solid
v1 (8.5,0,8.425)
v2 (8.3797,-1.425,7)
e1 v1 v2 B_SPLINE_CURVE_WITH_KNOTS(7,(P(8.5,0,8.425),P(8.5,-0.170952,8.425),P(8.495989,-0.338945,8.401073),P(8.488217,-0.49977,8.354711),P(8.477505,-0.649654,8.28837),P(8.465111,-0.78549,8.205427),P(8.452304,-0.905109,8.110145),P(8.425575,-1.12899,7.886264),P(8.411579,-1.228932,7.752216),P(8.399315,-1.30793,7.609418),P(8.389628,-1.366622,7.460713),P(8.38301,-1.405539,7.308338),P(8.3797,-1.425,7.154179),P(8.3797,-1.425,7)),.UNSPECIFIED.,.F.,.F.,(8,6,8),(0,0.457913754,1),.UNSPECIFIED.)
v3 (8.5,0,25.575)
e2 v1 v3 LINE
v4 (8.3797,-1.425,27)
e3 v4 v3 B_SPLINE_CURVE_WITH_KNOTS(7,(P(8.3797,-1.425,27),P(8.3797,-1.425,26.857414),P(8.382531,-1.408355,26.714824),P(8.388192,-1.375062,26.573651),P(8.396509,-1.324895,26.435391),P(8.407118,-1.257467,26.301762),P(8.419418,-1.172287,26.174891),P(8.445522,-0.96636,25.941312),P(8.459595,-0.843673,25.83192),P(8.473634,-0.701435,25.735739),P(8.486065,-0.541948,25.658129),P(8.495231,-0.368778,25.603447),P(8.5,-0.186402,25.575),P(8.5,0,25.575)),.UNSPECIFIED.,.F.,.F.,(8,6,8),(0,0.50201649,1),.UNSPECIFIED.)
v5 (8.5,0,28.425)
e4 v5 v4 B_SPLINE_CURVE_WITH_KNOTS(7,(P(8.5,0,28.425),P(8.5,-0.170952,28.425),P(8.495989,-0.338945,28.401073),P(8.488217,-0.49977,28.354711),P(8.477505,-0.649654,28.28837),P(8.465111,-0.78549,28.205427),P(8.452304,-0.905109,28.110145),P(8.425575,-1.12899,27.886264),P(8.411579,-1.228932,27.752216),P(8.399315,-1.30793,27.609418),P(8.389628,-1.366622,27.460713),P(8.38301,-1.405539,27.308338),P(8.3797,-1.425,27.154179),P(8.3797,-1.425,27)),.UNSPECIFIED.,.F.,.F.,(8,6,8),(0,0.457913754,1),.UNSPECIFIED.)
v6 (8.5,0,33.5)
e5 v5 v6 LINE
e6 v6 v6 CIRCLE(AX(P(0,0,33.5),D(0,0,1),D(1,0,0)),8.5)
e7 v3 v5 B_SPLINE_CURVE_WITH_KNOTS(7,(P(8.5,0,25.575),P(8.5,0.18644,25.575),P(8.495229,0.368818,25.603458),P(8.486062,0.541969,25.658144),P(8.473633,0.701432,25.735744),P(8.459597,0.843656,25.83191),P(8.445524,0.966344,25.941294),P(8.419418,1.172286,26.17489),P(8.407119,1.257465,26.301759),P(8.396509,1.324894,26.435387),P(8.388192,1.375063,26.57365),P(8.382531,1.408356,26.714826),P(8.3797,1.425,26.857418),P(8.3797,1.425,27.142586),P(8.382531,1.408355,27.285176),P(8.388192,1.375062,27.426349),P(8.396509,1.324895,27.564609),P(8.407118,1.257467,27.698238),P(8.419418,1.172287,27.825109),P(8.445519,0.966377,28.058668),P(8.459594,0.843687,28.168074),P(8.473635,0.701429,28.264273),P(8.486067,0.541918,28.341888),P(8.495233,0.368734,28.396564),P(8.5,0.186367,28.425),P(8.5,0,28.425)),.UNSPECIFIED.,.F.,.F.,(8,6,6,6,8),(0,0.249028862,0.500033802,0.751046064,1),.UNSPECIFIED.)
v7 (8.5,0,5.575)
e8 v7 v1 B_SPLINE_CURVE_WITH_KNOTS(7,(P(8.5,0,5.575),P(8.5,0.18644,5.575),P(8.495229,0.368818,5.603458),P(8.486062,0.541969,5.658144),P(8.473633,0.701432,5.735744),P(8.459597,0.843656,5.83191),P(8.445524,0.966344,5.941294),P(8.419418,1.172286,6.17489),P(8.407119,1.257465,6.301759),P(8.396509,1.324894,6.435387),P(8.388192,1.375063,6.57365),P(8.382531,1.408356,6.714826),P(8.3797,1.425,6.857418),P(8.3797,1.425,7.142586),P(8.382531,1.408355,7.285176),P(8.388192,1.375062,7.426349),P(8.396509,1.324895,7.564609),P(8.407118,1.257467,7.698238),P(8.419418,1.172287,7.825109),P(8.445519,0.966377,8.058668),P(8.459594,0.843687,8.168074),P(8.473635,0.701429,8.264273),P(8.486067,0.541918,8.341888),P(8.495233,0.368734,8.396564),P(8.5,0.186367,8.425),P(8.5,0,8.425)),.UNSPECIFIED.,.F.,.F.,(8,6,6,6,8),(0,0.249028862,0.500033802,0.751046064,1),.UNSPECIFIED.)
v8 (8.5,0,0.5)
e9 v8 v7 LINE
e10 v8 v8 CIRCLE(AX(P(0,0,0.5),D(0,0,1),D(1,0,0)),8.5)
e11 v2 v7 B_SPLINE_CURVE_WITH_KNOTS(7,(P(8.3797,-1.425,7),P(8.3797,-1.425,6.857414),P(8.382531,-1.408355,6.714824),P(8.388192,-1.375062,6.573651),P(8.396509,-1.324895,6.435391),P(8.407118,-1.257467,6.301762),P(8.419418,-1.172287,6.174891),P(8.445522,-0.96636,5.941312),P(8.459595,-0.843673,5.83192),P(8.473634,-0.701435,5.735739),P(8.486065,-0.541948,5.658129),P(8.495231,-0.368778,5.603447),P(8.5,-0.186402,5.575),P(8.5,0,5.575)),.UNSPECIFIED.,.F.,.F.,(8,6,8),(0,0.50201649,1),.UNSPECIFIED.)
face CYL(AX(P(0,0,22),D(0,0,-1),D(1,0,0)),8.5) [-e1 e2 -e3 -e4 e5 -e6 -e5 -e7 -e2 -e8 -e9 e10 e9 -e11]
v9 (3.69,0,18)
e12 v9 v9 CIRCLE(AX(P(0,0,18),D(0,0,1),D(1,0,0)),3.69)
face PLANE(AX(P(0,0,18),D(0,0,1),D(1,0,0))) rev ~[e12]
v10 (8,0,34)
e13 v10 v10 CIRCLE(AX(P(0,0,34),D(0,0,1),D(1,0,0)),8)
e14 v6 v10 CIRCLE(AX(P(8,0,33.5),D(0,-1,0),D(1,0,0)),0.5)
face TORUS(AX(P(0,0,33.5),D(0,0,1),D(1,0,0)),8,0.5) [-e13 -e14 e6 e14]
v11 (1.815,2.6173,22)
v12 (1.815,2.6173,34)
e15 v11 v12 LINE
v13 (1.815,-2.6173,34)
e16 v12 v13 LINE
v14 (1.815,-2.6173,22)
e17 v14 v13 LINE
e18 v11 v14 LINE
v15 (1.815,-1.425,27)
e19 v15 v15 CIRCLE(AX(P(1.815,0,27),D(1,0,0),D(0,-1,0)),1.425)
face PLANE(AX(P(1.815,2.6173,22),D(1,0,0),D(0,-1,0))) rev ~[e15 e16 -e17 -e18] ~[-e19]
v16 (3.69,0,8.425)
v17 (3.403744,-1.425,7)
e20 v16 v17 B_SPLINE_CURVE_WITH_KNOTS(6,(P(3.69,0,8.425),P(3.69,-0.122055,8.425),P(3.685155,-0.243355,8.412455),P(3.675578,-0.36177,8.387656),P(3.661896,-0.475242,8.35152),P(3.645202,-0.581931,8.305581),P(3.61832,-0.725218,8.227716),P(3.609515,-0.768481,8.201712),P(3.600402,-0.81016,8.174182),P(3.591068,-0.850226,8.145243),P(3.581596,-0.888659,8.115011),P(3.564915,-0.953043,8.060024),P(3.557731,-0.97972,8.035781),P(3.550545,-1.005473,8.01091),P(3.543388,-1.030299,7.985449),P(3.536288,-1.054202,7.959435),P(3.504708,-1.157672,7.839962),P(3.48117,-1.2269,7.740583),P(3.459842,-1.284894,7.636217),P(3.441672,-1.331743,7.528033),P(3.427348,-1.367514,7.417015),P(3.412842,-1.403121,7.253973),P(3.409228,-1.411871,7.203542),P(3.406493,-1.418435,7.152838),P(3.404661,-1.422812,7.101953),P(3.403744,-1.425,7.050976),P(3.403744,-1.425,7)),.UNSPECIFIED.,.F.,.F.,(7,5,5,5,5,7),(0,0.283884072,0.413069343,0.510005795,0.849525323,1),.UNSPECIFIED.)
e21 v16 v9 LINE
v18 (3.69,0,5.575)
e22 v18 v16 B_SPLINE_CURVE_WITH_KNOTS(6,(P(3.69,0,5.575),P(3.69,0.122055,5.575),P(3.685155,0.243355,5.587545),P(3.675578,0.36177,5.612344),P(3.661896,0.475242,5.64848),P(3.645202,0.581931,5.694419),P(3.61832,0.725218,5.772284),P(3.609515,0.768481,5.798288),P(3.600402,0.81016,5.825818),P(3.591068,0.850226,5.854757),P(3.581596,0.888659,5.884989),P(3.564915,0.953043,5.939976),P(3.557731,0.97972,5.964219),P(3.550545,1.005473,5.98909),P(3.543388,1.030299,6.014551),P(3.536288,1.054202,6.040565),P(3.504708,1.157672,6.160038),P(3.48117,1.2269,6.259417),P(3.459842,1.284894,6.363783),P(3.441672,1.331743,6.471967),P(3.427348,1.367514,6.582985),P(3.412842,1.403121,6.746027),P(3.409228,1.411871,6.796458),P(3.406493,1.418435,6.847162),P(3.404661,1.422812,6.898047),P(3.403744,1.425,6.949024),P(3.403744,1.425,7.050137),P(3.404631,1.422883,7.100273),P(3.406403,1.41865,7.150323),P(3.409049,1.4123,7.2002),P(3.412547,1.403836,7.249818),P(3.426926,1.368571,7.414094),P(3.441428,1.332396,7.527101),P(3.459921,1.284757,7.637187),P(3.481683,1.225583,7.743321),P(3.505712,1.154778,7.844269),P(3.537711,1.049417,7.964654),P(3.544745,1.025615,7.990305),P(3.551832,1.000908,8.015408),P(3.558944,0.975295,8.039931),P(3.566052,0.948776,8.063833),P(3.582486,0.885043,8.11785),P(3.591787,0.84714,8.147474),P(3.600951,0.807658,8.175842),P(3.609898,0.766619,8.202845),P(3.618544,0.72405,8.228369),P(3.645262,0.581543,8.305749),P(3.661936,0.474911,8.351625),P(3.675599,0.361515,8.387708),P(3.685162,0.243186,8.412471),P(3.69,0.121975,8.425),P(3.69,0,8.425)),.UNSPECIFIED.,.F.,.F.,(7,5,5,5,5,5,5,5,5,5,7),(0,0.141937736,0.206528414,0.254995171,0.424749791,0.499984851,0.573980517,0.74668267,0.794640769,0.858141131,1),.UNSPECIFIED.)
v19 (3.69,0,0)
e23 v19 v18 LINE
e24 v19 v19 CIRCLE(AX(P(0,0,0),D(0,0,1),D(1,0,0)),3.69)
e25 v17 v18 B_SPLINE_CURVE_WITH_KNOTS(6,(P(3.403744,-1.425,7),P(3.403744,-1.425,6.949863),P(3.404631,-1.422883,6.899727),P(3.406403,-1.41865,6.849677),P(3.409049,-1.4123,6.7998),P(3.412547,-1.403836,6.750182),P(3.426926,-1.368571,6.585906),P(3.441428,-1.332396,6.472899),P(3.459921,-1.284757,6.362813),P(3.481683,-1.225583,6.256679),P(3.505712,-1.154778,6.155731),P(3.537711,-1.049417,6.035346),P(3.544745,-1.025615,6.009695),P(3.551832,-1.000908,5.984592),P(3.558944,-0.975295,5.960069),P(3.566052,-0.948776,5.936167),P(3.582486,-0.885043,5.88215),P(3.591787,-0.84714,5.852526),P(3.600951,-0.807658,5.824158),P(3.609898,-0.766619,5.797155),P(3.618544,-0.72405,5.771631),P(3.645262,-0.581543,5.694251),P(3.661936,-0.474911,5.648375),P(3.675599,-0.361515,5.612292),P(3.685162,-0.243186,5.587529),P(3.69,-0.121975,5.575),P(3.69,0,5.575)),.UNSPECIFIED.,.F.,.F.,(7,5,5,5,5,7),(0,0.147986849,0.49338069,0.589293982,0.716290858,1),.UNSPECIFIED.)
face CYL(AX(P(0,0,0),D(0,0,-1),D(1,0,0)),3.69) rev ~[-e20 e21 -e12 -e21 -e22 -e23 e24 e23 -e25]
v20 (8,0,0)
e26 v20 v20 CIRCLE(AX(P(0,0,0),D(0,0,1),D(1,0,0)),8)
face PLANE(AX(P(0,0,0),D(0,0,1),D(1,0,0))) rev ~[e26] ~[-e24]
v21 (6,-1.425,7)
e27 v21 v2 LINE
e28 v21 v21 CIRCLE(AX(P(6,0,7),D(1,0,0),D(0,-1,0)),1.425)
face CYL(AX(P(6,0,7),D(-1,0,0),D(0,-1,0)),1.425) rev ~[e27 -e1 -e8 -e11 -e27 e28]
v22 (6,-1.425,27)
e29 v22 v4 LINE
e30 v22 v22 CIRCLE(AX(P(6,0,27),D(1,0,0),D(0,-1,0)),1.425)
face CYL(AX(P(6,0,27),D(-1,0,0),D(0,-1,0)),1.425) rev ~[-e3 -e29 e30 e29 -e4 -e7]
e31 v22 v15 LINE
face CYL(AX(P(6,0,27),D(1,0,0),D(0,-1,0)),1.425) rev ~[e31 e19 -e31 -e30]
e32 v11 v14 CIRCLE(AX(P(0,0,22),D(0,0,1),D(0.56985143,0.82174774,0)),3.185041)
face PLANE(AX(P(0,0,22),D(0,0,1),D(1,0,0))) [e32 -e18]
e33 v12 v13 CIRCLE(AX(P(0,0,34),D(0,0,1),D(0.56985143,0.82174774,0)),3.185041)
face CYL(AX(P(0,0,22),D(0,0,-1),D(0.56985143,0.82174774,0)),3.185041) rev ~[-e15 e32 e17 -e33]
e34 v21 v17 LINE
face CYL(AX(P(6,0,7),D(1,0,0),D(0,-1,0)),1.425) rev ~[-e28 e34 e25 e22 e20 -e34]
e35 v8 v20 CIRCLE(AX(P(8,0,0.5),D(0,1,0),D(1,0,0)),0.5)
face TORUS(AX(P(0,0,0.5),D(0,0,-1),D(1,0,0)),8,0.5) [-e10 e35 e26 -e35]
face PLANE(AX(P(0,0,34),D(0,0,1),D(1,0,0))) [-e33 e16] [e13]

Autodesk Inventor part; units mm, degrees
ref_plane "YZ Plane" through (0, 0, 0) normal (1, 0, 0) x (0, 1, 0)
ref_plane "XZ Plane" through (0, 0, 0) normal (0, 1, 0) x (-1, 0, 0)
sketch "Sketch1" plane through (0, 0, 0) normal (0, 0, 1) x (1, 0, 0)
  circle A0 centre (0, 0) radius 8.5
  circle A1 centre (0, 0) radius 3.69
  dimension "d0" = 17
  dimension "d3" = 7.38
  dimension "d20" = 4.81
extrude "Extrusion2" add sketch "Sketch1" along normal blind 18
sketch "Sketch2" plane through (0, 0, 18) normal (0, 0, 1) x (1, 0, 0)
  circle A0 centre (0, 0) radius 8.5
  circle A1 centre (0, 0) radius 8.5 projected
extrude "Extrusion3" add sketch "Sketch2" along normal blind 4
sketch "Sketch3" plane through (0, 0, 22) normal (0, 0, 1) x (1, 0, 0)
  arc A0 (1.815, 2.6173) -> (1.815, -2.6173) centre (0, 0) ccw
  circle A1 centre (0, 0) radius 8.5
  line L0 (1.815, 2.6173) -> (1.815, -2.6173)
  circle A2 centre (0, 0) radius 8.5 projected
  dimension "d8" = 6.37
  dimension "d11" = 5
  dimension "d12" = 1.815
extrude "Extrusion4" add sketch "Sketch3" along normal blind 12
ref_plane "Work Plane2" through (6, -1.3086, 34) normal (1, 0, 0) x (0, -1, 0)
ref_plane "Work Plane1" through (1.815, -1.3086, 34) normal (1, 0, 0) x (0, -1, 0)
sketch "Sketch4" plane through (6, -1.3086, 34) normal (1, 0, 0) x (0, -1, 0)
  circle A0 centre (-1.3086, 7) radius 1.425
  circle A1 centre (-1.3086, 27) radius 1.425
  line L0 (-9.8086, 0) -> (7.1914, 0) projected
  line L1 (7.1914, 34) -> (-9.8086, 34) projected
  point P0 (-1.3086, 34)
  dimension "d14" = 2.85
  dimension "d15" = 7
  dimension "d16" = 7
extrude "Extrusion5" cut sketch "Sketch4" along normal blind 6.185 and the other way blind 5
fillet "Fillet1" radius 0.5 2 edges at (-8.5, 0, 34) (-8.5, 0, 0)
properties part number "schroefkoppeling motor en overbrening"
